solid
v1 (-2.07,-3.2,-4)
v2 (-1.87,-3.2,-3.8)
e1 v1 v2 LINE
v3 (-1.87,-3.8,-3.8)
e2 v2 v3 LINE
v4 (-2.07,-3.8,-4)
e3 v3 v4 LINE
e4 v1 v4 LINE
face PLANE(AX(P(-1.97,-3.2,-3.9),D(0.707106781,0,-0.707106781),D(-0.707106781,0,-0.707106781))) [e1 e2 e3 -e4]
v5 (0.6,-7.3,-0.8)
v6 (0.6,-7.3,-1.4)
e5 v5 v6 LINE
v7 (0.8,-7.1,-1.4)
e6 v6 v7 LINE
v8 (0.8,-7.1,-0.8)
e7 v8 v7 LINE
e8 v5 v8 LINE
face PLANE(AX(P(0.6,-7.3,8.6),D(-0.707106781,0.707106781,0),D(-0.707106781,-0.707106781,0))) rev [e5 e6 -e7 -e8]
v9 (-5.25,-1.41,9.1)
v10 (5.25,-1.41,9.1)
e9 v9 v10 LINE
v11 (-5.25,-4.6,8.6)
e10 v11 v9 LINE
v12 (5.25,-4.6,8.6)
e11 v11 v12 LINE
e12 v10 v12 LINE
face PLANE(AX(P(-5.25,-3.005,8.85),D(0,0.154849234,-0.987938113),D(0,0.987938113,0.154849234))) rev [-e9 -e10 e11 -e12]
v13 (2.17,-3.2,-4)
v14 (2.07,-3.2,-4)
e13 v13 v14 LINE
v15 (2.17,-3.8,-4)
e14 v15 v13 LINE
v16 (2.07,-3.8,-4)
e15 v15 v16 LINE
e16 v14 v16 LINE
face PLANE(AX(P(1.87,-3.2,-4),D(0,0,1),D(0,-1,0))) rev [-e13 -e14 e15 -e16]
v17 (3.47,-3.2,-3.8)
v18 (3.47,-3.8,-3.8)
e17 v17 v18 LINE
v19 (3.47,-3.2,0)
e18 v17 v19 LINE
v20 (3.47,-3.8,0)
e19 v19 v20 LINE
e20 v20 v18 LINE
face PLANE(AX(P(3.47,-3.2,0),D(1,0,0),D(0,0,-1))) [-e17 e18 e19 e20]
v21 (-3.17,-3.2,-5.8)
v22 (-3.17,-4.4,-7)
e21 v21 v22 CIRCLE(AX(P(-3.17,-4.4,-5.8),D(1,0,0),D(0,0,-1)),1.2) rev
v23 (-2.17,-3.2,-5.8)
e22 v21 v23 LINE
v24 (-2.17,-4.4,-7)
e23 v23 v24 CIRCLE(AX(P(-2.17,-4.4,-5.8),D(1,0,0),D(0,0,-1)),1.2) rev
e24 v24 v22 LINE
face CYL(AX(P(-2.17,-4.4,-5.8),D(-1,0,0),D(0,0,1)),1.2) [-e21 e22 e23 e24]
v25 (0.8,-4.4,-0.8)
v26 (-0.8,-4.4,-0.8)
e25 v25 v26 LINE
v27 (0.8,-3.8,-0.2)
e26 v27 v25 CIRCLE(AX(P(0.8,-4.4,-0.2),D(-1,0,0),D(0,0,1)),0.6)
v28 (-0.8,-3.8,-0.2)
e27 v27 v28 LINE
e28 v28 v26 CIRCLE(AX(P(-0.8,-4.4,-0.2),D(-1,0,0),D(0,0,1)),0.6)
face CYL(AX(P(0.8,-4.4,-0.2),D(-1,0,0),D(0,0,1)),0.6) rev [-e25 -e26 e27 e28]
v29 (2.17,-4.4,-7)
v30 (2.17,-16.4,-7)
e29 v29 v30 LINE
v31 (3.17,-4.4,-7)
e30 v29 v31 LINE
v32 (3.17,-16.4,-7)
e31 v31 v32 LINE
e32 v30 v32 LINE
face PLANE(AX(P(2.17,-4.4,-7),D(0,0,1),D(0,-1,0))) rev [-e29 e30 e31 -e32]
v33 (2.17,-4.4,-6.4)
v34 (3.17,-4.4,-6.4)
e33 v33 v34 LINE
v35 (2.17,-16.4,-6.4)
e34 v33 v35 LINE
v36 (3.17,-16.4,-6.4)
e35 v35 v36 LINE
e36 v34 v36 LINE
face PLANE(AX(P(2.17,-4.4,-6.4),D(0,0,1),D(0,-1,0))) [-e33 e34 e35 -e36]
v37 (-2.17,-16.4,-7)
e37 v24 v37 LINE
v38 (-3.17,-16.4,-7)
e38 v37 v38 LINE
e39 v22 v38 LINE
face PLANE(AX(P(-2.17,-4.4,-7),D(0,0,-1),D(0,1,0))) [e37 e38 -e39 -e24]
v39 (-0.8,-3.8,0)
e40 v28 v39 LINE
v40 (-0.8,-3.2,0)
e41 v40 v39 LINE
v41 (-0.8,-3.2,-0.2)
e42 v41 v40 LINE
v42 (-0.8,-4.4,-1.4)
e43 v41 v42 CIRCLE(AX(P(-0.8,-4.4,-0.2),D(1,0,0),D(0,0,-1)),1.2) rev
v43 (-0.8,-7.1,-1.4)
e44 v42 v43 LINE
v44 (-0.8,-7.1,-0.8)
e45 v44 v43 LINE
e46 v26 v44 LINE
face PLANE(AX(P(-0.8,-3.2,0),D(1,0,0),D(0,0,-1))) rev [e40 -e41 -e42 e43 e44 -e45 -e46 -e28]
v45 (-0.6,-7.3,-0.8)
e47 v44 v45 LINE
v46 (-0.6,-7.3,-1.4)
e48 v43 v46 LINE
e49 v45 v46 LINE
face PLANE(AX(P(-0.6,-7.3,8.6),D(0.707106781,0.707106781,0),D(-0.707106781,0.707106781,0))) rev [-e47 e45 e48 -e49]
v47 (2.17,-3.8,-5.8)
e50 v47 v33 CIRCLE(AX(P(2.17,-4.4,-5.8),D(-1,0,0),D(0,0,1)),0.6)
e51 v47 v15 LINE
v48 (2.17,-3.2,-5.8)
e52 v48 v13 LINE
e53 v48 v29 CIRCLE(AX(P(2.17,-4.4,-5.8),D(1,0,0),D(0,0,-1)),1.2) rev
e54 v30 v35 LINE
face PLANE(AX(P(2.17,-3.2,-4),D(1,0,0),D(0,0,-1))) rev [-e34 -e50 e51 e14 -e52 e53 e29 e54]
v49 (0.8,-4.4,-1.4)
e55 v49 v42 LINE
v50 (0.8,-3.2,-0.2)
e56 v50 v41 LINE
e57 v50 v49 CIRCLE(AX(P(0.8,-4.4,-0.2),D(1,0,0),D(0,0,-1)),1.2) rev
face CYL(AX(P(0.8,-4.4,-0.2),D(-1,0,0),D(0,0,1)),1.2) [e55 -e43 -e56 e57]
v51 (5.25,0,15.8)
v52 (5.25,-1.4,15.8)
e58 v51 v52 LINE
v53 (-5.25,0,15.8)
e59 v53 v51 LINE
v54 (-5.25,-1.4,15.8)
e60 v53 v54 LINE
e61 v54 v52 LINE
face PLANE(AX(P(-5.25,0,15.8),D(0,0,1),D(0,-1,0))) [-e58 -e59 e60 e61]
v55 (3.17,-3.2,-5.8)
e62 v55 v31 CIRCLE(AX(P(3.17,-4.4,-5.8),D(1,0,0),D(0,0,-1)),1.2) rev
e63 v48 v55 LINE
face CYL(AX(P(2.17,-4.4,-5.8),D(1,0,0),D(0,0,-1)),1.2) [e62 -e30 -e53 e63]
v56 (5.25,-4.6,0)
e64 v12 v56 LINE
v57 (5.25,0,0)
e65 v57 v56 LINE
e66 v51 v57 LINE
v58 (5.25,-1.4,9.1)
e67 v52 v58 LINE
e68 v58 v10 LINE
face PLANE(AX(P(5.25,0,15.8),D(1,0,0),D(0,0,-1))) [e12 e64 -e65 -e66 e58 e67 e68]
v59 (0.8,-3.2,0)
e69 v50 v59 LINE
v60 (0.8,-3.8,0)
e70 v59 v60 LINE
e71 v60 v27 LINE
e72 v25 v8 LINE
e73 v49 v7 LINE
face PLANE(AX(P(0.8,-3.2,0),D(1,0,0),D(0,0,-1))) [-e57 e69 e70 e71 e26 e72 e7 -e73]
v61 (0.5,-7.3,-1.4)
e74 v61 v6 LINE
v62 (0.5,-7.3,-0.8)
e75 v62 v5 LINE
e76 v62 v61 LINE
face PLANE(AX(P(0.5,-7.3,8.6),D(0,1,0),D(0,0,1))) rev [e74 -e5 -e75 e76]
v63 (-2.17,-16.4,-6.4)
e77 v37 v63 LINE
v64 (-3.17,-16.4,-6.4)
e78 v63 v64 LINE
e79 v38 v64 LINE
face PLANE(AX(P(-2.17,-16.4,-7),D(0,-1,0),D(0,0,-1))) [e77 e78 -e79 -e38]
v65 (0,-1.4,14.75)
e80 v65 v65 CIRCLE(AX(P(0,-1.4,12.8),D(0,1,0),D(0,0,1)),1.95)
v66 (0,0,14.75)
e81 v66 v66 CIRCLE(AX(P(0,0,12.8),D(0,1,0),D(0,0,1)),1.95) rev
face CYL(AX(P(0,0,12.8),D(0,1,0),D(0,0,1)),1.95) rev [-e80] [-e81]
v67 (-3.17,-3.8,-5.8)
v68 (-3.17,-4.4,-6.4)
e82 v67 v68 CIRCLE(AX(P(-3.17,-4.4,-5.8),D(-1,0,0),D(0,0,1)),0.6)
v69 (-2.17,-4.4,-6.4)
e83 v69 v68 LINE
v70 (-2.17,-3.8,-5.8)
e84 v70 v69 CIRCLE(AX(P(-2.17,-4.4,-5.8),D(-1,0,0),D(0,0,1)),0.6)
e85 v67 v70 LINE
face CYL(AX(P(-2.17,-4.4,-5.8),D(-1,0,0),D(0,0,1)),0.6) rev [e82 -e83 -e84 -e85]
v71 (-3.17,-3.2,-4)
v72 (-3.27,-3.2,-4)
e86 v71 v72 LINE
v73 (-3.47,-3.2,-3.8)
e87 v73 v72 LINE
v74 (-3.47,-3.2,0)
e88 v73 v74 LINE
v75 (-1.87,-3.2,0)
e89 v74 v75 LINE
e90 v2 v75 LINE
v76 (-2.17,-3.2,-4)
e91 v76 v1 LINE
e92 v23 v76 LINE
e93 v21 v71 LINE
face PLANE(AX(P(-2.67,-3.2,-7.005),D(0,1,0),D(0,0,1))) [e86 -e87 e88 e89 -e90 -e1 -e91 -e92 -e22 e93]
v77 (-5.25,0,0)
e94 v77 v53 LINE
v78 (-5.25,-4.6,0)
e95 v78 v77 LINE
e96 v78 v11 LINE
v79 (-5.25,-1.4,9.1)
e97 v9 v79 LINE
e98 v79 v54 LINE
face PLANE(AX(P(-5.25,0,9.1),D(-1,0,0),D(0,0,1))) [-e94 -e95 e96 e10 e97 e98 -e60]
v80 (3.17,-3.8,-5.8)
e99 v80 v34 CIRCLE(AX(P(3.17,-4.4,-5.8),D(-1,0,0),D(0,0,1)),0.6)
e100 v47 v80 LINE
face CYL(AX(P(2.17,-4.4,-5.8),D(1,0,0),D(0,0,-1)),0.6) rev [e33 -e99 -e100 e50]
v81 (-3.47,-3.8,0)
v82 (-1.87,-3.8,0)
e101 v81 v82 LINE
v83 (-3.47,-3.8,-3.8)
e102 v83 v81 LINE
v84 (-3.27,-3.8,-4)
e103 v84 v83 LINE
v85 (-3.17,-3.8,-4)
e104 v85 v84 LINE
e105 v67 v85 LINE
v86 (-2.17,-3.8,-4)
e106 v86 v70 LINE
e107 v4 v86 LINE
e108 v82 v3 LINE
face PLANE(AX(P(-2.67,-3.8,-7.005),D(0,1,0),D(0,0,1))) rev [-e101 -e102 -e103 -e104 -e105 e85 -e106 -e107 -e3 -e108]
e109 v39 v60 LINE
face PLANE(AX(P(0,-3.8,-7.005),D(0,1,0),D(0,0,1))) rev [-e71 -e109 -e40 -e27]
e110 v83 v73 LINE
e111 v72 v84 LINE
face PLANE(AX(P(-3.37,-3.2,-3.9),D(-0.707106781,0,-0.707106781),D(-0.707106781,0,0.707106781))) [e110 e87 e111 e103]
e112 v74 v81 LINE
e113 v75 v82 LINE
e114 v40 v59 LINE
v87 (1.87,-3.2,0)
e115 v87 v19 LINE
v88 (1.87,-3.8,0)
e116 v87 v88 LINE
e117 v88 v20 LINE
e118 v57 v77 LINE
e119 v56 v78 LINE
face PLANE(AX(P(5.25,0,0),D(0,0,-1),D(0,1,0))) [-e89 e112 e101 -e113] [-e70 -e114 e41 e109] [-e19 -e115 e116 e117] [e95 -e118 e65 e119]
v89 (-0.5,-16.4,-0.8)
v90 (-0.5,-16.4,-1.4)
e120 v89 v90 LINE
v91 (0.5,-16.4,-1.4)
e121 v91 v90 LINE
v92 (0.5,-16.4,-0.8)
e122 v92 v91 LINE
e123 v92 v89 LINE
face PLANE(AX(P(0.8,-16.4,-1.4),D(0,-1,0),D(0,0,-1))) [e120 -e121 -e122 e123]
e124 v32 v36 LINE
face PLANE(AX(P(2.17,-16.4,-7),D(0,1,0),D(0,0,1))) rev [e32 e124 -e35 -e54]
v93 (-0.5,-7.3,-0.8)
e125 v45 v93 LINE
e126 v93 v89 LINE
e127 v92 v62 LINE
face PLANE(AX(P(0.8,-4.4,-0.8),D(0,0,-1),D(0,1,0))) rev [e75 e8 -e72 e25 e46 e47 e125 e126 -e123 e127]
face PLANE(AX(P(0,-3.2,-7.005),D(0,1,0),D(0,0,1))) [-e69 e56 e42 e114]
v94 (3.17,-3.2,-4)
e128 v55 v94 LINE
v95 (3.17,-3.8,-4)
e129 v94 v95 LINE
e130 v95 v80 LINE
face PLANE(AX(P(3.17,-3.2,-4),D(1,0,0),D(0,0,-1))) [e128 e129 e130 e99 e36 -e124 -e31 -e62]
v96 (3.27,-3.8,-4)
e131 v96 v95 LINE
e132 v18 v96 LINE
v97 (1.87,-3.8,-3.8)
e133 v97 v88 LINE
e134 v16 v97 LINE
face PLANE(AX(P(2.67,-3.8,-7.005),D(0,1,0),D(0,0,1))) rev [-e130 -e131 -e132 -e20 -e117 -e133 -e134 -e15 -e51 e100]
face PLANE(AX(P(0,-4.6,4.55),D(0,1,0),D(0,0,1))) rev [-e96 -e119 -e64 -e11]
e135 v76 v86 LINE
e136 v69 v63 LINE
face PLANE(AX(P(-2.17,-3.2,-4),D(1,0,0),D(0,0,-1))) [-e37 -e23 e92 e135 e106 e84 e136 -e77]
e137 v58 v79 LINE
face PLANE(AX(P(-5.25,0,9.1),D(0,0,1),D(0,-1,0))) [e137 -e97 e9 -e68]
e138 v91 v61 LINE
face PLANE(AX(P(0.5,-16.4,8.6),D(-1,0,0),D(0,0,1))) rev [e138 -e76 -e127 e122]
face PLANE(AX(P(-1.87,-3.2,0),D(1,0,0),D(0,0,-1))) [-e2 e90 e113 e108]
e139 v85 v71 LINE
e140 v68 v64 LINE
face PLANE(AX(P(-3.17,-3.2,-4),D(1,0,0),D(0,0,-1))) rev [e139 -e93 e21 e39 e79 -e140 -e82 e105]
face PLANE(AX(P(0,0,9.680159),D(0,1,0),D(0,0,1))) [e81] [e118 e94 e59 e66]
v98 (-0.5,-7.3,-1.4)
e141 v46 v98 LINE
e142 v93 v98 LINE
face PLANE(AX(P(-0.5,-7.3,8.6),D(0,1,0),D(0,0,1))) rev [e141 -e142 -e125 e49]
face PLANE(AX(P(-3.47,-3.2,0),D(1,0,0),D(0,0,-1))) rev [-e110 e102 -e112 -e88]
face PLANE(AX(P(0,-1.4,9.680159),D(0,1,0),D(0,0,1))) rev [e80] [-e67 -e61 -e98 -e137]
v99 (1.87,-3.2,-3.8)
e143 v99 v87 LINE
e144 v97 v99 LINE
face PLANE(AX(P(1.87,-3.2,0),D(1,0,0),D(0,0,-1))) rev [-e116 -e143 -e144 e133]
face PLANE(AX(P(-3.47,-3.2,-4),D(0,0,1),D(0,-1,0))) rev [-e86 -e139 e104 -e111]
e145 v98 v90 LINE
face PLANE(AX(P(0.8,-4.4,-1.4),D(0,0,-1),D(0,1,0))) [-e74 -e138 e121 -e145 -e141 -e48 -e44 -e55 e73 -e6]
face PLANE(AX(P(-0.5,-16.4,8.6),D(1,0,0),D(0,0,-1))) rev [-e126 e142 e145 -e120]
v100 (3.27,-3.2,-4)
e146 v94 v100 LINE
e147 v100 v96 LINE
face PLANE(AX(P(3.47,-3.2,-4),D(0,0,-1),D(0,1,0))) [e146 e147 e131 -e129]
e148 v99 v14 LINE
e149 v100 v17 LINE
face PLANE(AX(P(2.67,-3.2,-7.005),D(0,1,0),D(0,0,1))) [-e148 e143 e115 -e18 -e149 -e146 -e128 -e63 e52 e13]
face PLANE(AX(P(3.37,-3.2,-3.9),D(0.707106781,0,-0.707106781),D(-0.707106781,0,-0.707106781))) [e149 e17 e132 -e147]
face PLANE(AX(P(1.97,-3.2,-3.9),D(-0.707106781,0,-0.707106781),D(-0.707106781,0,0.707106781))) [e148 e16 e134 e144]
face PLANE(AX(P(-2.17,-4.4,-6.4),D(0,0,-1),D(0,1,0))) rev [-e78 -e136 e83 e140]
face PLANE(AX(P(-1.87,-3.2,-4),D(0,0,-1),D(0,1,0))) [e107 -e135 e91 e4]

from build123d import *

# Parameters (mm, degrees)
CORTAR_EXTRUIR1_START       = 1.8
CORTAR_EXTRUIR1_OUTLINE_W   = 10.5
CORTAR_EXTRUIR1_OUTLINE_H   = 15.8
CORTAR_EXTRUIR1_OUTLINE_R   = 1.95
CORTAR_EXTRUIR1_DEPTH       = 1.4
CORTAR_EXTRUIR1_START_2     = -0.6
CORTAR_EXTRUIR1_2_DEPTH     = 0.6
CORTAR_EXTRUIR1_START_3     = 1.79
CORTAR_EXTRUIR1_3_OUTLINE_W = 10.5
CORTAR_EXTRUIR1_3_OUTLINE_H = 9.1
CORTAR_EXTRUIR1_3_DEPTH     = 0.01
CORTAR_EXTRUIR1_START_4     = -5.25
CORTAR_EXTRUIR1_4_DEPTH     = 10.5
CROQUIS2_W                  = 1.6
CROQUIS2_H                  = 4.4
CORTAR_EXTRUIR2_DEPTH       = 10
EXTRUIR_L_MINA1_DEPTH       = 0.8
CROQUIS5_W                  = 8.6
CROQUIS5_H                  = 0.6
CORTAR_EXTRUIR3_DEPTH       = 25.279546948
EXTRUIR_L_MINA2_DEPTH       = 0.5
CUT_EXTRUDE1_DEPTH          = 10


with BuildPart() as part:
    # Cortar-Extruir1: read off the stored shape, not the designer's step
    # Cortar-Extruir1 outline → Cortar-Extruir1 (new body)
    with BuildSketch(Plane(origin=(0, -3.2, 0), x_dir=(1, 0, 0), z_dir=(0, 1, 0)).offset(CORTAR_EXTRUIR1_START)):
        with Locations((0, -7.9)):
            Rectangle(CORTAR_EXTRUIR1_OUTLINE_W, CORTAR_EXTRUIR1_OUTLINE_H)
        with Locations((0, -12.8)):
            Circle(CORTAR_EXTRUIR1_OUTLINE_R, mode=Mode.SUBTRACT)
    extrude(amount=CORTAR_EXTRUIR1_DEPTH)

    # Cortar-Extruir1 3 outline → Cortar-Extruir1 3 (add)
    with BuildSketch(Plane(origin=(0, -3.2, 0), x_dir=(1, 0, 0), z_dir=(0, 1, 0)).offset(CORTAR_EXTRUIR1_START_3)):
        with Locations((0, -4.55)):
            Rectangle(CORTAR_EXTRUIR1_3_OUTLINE_W, CORTAR_EXTRUIR1_3_OUTLINE_H)
    extrude(amount=CORTAR_EXTRUIR1_3_DEPTH)



with BuildPart() as body_2:
    # Cortar-Extruir1 2 outline → Cortar-Extruir1 2 (new body)
    with BuildSketch(Plane(origin=(0, -3.2, 0), x_dir=(1, 0, 0), z_dir=(0, 1, 0)).offset(CORTAR_EXTRUIR1_START_2)):
        Polygon((1.87, 0), (3.47, 0), (3.47, 3.8), (3.27, 4), (3.17, 4), (3.17, 14.4), (2.17, 14.4), (2.17, 4), (2.07, 4), (1.87, 3.8), align=None)
        Polygon((-0.8, 0), (0.8, 0), (0.8, 3.8), (0.6, 4), (0.5, 4), (0.5, 4.5), (-0.5, 4.5), (-0.5, 4), (-0.6, 4), (-0.8, 3.8), align=None)
        Polygon((-3.47, 0), (-1.87, 0), (-1.87, 3.8), (-2.07, 4), (-2.17, 4), (-2.17, 14.4), (-3.17, 14.4), (-3.17, 4), (-3.27, 4), (-3.47, 3.8), align=None)
    extrude(amount=CORTAR_EXTRUIR1_2_DEPTH)


with BuildPart() as part_1:
    add(part.part)

    add(body_2.part)  # Cortar-Extruir1 4 merges body 2
    # Cortar-Extruir1 4 outline → Cortar-Extruir1 4 (add)
    with BuildSketch(Plane.YZ.offset(CORTAR_EXTRUIR1_START_4)):
        Polygon((-1.41, 9.1), (-4.6, 8.6), (-4.6, 0), (-1.41, 0), align=None)
    extrude(amount=CORTAR_EXTRUIR1_4_DEPTH)

    # Croquis2 → Cortar-Extruir2 (cut)
    with BuildSketch(Plane(origin=(0, -3.2, 0), x_dir=(1, 0, 0), z_dir=(0, 1, 0))):
        with Locations((0, 2.3)):
            Rectangle(CROQUIS2_W, CROQUIS2_H)
    extrude(amount=-CORTAR_EXTRUIR2_DEPTH, mode=Mode.SUBTRACT)

    # Croquis3 → Extruir-Lámina1 (add, symmetric)
    with BuildSketch(Plane(origin=(0, 0, 0), x_dir=(0, 0, -1), z_dir=(1, 0, 0))):
        with BuildLine():
            Line((0.1, -3.8), (0.2, -3.8))
            ThreePointArc((0.2, -3.8), (0.624264069, -3.975735931), (0.8, -4.4))
            Line((0.8, -4.4), (0.8, -16.4))
            Line((0.8, -16.4), (1.4, -16.4))
            Line((1.4, -16.4), (1.4, -4.4))
            ThreePointArc((1.4, -4.4), (1.048528137, -3.551471863), (0.2, -3.2))
            Line((0.2, -3.2), (0.1, -3.2))
            Line((0.1, -3.2), (0.1, -3.8))
        make_face()
    extrude(amount=EXTRUIR_L_MINA1_DEPTH, both=True)

    # Croquis5 → Cortar-Extruir3 (cut, through all)
    with BuildSketch(Plane(origin=(3.17, 0, 0), x_dir=(0, 0, -1), z_dir=(1, 0, 0))):
        with Locations((10.1, -3.5)):
            Rectangle(CROQUIS5_W, CROQUIS5_H)
    extrude(amount=-CORTAR_EXTRUIR3_DEPTH, mode=Mode.SUBTRACT)

    # Croquis6 → Extruir-Lámina2 (add, symmetric)
    with BuildSketch(Plane(origin=(-2.67, 0, 0), x_dir=(0, 0, -1), z_dir=(1, 0, 0))):
        with BuildLine():
            ThreePointArc((5.8, -3.8), (6.224264069, -3.975735931), (6.4, -4.4))
            Line((6.4, -4.4), (6.4, -16.4))
            Line((6.4, -16.4), (7, -16.4))
            Line((7, -16.4), (7, -4.4))
            ThreePointArc((7, -4.4), (6.648528137, -3.551471863), (5.8, -3.2))
            Line((5.8, -3.2), (5.8, -3.8))
        make_face()
    extruir_l_mina2 = extrude(amount=EXTRUIR_L_MINA2_DEPTH, both=True)

    # Simetría1: Extruir-Lámina2 across plane
    add(extruir_l_mina2.mirror(Plane(origin=(0, 0, 0), x_dir=(0, 0, 1), z_dir=(1, 0, 0))))

    # Sketch2 → Cut-Extrude1 (cut)
    with BuildSketch(Plane(origin=(0, 0, -1.4), x_dir=(-1, 0, 0), z_dir=(0, 0, -1))):
        Polygon((-0.5, -16.4), (-0.5, -7.3), (-0.6, -7.3), (-0.8, -7.1), (-0.8, -16.4), align=None)
        Polygon((0.8, -16.4), (0.5, -16.4), (0.5, -7.3), (0.6, -7.3), (0.8, -7.1), align=None)
    extrude(amount=-CUT_EXTRUDE1_DEPTH, mode=Mode.SUBTRACT)


solid = part_1.part
